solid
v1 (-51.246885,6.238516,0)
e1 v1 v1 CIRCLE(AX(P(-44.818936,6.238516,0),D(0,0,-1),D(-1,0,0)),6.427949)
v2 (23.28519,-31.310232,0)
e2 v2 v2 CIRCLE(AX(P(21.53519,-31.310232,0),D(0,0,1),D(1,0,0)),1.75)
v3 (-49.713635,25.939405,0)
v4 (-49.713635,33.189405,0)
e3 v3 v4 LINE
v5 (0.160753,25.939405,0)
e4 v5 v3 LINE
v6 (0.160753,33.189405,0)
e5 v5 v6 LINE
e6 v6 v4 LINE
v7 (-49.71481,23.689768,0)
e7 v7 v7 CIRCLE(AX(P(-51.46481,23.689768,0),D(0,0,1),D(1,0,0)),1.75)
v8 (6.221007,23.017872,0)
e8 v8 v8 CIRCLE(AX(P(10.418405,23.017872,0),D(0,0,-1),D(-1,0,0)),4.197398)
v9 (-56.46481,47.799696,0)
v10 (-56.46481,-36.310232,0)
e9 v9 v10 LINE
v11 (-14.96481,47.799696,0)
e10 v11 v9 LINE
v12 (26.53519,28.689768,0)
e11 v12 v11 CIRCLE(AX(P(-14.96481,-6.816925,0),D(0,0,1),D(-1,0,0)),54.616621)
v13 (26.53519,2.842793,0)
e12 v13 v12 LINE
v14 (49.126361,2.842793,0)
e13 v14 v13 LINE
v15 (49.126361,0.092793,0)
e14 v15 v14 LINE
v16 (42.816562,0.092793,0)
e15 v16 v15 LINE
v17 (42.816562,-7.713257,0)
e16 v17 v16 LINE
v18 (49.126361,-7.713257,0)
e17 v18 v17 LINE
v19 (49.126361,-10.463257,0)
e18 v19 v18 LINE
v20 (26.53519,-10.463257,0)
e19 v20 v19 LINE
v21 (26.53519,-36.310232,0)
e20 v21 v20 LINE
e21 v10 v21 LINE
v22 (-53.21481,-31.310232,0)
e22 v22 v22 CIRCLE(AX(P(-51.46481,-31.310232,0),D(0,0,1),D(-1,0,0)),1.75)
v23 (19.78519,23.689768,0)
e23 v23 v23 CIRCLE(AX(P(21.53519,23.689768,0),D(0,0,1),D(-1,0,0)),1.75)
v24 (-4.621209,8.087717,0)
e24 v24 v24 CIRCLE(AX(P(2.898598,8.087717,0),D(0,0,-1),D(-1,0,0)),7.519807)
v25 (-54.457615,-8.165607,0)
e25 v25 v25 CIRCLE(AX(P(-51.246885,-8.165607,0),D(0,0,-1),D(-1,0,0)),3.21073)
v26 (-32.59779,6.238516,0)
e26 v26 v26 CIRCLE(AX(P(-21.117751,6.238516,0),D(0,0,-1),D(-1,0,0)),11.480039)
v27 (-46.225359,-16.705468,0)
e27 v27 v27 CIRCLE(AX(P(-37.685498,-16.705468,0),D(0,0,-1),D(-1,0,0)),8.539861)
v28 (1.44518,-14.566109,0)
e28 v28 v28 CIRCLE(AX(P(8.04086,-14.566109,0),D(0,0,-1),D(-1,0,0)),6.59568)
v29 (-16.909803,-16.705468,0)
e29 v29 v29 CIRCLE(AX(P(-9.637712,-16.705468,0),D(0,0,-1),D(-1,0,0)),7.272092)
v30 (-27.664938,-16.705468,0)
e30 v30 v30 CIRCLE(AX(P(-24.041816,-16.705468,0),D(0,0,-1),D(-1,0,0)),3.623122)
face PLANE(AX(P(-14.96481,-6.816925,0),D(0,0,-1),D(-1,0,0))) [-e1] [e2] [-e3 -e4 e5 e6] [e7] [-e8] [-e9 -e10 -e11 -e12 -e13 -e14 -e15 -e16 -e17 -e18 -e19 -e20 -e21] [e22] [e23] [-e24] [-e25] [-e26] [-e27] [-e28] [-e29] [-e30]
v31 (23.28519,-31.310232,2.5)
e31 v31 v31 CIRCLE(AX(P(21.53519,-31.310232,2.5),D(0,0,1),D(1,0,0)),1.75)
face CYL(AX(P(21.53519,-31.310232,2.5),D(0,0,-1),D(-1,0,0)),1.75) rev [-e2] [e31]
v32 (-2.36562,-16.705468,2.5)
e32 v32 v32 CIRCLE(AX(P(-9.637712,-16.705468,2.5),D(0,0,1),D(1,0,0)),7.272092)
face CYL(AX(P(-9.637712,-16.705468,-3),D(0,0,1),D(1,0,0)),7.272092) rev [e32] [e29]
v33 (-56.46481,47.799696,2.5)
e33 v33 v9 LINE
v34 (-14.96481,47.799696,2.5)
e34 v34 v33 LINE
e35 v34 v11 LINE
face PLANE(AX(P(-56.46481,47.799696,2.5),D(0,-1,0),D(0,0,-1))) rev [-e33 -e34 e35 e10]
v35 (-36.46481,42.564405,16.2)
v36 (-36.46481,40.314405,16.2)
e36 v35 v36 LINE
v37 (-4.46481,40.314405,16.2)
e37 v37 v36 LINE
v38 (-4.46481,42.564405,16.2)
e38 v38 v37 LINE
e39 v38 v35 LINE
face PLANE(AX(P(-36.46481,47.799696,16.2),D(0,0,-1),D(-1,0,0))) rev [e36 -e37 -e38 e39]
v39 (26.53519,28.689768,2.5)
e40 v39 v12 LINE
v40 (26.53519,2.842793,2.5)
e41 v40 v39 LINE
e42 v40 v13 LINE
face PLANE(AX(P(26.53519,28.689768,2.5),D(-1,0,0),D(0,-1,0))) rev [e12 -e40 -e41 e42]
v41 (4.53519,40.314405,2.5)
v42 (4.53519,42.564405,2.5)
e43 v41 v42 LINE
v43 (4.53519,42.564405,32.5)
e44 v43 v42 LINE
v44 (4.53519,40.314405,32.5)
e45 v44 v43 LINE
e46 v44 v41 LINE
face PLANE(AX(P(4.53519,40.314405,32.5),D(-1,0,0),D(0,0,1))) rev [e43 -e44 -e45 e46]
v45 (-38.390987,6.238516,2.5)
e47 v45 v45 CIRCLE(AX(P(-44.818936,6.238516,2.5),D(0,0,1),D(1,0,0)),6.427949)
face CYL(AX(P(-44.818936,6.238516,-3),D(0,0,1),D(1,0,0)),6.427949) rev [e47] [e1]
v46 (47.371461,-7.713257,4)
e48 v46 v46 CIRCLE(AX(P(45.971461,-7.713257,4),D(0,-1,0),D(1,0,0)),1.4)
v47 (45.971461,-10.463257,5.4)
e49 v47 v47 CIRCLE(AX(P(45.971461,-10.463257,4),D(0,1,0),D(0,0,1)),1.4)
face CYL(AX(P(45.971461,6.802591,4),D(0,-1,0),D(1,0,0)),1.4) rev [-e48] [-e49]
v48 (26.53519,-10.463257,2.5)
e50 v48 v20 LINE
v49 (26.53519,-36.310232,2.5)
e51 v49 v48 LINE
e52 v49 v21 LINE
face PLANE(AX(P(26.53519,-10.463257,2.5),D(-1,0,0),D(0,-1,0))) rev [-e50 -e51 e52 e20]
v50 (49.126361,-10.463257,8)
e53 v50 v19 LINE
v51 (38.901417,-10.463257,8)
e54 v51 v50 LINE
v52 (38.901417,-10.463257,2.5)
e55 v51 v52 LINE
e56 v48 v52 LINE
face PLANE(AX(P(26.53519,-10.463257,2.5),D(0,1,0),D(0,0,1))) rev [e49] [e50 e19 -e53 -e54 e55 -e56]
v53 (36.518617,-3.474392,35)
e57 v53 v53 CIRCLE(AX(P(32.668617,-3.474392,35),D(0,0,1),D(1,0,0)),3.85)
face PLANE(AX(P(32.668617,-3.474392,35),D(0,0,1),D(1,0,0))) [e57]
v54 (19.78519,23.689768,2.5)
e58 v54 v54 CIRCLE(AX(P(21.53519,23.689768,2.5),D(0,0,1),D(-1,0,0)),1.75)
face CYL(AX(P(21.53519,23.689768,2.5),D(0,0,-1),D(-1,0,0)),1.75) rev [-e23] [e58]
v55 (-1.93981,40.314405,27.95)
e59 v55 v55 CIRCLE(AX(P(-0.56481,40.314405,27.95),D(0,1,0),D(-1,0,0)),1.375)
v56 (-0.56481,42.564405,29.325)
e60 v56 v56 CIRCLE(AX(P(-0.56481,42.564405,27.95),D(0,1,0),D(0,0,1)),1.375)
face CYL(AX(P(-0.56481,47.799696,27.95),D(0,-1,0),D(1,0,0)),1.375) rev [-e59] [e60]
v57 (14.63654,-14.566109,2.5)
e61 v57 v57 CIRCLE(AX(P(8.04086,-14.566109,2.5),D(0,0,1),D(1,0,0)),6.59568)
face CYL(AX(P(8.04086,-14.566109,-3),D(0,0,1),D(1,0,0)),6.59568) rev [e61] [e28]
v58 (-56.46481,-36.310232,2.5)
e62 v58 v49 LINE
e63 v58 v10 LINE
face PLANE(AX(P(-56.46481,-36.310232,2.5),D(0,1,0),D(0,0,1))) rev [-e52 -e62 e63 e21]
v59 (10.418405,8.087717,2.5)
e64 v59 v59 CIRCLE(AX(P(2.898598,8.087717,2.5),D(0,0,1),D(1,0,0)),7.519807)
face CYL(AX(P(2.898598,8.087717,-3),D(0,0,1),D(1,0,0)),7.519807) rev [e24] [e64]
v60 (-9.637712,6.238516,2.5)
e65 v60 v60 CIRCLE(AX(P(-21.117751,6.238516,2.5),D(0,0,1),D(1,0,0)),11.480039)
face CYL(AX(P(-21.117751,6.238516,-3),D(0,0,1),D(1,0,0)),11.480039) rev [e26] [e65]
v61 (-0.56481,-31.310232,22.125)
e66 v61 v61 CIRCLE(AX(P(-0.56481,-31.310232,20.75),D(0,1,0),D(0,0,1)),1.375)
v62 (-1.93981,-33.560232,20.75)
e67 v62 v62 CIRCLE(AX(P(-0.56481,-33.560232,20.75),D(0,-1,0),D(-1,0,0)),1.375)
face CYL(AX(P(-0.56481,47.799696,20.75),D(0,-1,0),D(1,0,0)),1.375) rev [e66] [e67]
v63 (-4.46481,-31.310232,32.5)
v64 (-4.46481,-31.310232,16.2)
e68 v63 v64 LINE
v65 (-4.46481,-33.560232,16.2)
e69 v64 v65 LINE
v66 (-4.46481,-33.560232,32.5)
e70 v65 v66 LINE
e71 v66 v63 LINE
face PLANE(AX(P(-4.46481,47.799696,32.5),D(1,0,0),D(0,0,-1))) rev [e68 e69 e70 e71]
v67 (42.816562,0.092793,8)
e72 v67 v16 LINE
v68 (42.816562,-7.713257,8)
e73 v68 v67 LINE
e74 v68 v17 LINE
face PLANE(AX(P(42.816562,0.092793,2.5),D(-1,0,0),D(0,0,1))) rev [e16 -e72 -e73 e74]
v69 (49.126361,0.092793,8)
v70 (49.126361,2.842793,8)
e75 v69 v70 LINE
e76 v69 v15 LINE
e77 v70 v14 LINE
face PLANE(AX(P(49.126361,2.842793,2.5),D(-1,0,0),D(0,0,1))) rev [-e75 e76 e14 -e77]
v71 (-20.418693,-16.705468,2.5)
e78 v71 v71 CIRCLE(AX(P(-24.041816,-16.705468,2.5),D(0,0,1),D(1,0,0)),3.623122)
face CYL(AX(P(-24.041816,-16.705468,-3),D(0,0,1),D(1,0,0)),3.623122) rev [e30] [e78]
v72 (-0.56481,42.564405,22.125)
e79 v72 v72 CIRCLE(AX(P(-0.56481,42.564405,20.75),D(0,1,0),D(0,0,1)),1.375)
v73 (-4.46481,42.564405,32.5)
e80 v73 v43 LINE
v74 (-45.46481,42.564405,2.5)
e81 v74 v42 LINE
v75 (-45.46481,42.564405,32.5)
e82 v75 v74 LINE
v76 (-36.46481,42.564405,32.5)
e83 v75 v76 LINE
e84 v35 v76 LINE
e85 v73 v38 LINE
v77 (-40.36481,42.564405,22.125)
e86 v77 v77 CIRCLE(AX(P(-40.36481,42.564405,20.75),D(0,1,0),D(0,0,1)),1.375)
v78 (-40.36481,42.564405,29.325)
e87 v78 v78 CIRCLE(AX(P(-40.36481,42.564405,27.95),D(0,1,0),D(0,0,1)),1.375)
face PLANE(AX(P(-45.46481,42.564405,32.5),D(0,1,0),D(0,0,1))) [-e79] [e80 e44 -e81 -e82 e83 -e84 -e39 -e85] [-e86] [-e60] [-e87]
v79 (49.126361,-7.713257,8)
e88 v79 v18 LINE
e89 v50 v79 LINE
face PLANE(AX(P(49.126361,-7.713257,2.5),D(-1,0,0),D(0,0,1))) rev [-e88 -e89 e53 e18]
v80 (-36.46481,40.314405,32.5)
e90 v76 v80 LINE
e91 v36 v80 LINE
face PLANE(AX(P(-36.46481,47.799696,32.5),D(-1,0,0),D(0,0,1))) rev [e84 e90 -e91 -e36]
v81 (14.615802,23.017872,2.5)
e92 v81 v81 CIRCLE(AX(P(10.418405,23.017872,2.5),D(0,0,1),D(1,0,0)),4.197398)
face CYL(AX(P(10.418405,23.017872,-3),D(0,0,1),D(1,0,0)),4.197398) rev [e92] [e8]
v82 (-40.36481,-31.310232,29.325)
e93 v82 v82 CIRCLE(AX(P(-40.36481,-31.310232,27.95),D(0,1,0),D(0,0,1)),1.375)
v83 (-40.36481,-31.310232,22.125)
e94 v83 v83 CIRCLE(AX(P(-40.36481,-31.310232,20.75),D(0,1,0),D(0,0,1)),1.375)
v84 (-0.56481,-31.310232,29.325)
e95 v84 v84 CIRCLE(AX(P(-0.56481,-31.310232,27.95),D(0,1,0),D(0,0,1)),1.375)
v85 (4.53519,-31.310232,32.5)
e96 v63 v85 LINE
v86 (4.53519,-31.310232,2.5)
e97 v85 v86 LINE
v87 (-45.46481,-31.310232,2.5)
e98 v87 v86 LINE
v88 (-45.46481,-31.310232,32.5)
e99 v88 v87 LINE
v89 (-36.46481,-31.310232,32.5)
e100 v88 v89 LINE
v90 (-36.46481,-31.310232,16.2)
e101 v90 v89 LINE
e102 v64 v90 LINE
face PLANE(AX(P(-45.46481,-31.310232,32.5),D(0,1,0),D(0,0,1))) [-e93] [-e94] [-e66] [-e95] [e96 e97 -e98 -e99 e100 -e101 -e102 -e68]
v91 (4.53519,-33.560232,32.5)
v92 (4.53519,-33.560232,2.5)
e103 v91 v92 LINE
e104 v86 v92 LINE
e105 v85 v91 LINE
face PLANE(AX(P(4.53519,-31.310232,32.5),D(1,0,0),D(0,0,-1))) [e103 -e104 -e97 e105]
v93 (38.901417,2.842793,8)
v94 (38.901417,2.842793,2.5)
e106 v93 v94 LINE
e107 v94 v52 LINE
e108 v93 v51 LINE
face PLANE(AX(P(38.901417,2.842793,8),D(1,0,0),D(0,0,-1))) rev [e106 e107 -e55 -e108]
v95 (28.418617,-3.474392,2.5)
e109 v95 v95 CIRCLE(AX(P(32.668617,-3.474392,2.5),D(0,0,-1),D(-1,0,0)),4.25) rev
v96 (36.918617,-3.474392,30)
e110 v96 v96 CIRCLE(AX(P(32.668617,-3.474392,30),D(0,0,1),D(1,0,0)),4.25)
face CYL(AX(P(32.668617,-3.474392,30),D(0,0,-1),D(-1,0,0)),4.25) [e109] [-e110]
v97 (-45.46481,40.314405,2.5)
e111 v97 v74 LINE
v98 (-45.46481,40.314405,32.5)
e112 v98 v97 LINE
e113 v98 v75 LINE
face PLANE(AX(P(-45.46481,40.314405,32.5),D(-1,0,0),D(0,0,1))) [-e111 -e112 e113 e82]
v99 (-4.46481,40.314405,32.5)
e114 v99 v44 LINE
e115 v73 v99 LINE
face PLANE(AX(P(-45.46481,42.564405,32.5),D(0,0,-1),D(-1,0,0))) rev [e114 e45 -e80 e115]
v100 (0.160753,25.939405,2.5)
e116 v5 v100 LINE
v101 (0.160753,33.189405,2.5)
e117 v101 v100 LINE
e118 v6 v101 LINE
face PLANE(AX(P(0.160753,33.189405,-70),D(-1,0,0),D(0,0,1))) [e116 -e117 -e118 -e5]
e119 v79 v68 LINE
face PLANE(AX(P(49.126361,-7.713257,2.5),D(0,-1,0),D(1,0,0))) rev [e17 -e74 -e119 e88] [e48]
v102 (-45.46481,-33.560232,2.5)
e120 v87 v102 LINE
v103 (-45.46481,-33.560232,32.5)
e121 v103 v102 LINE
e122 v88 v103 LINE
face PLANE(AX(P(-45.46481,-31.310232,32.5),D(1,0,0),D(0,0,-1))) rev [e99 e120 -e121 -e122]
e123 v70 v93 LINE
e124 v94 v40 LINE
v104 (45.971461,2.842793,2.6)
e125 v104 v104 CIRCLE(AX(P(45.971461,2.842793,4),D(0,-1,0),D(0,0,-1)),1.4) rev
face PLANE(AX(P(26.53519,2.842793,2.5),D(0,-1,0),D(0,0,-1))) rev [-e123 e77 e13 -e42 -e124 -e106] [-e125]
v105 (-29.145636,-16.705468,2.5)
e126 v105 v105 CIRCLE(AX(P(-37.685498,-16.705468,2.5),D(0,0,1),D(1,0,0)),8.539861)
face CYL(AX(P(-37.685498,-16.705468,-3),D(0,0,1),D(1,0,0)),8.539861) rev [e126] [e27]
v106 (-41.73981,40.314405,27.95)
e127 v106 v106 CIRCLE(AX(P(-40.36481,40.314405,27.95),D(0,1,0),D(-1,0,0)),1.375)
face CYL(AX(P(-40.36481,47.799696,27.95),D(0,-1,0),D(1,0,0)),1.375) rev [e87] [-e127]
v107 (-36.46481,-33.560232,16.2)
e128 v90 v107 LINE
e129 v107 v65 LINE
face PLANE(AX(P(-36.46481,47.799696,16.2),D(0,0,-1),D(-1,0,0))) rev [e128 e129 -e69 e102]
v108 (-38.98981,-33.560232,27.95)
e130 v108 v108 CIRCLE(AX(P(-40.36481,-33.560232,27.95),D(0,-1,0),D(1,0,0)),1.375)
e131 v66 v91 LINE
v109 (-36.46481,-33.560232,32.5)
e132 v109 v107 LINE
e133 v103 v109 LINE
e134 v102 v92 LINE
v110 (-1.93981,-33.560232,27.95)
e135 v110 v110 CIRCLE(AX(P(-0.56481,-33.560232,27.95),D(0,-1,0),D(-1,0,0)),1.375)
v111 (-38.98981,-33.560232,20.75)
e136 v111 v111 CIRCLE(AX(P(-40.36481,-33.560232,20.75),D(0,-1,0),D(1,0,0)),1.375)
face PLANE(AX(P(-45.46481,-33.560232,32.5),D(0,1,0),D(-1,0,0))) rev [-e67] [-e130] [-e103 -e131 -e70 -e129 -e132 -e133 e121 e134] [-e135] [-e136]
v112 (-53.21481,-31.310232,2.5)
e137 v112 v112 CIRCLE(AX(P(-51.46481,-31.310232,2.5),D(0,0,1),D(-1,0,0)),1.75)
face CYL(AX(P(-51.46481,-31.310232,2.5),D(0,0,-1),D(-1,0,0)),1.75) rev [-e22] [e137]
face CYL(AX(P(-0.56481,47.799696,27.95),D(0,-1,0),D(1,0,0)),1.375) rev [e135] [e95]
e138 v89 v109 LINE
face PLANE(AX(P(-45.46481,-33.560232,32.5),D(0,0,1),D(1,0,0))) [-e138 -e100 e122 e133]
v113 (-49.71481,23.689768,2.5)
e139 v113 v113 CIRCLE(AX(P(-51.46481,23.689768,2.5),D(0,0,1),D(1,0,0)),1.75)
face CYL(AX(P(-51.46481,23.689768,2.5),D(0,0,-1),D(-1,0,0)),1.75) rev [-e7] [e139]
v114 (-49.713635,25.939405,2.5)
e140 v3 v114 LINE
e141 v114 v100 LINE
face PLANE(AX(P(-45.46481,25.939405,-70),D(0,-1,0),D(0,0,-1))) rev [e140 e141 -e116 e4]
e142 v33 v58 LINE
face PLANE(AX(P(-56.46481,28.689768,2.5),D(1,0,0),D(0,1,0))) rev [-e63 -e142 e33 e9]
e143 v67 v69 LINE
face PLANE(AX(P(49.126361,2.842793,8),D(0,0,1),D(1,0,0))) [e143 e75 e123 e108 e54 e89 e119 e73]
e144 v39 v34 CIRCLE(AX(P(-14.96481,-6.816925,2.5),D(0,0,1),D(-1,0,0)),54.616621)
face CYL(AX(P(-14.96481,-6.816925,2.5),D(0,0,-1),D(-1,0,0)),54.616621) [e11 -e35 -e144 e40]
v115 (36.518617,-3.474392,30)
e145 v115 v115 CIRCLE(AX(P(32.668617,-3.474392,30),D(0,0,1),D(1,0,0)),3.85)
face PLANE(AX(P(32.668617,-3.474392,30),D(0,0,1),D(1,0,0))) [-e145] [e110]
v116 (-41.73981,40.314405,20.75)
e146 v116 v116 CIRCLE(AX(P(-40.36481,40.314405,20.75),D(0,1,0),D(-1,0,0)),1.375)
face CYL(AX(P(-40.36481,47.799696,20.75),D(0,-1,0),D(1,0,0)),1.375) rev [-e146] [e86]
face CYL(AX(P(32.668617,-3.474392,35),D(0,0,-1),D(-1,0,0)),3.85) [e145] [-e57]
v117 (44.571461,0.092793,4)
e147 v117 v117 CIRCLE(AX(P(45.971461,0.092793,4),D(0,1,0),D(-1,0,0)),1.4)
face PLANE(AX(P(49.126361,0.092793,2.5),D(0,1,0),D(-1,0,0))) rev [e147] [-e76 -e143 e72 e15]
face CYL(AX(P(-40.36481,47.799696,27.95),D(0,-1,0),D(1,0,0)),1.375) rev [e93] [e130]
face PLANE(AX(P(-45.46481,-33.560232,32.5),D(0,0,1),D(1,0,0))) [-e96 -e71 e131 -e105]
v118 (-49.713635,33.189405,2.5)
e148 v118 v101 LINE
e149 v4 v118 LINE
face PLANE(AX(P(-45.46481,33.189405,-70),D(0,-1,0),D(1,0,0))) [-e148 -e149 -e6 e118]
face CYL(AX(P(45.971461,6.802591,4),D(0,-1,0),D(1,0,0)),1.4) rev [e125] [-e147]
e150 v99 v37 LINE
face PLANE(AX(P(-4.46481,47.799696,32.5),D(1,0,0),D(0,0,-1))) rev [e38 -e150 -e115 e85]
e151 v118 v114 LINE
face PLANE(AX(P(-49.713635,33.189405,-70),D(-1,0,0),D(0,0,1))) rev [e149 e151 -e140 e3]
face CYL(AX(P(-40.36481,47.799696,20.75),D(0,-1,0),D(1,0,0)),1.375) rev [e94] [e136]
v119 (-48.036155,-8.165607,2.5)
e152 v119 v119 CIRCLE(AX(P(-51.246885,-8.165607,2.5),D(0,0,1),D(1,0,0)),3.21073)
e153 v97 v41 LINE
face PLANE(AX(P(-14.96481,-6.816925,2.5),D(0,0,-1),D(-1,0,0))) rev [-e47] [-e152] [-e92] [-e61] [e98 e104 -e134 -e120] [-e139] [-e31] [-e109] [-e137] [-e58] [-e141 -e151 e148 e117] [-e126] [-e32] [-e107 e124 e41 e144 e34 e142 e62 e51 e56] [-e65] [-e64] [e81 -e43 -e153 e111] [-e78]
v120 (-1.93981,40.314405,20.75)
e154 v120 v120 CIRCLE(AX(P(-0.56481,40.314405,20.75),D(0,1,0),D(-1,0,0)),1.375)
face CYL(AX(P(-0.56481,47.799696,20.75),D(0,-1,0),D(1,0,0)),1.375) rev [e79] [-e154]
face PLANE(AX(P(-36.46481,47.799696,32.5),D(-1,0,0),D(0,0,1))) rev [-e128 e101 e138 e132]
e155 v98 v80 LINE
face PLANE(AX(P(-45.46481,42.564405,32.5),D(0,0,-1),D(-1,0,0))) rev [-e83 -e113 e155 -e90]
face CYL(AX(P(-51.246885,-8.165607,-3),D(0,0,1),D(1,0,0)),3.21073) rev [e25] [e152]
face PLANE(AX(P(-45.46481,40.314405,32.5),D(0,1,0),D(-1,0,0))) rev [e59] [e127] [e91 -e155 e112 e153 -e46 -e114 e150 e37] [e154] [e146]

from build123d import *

# Parameters (mm, degrees)
SKETCH1_R                      = 1.75
BOSS_EXTRUDE1_DEPTH            = 2.5
CUT_EXTRUDE1_DEPTH             = 72.5
SKETCH3_3_W                    = 50
SKETCH3_3_H                    = 2.25
BOSS_EXTRUDE2_DEPTH            = 30
SKETCH6_R                      = 1.375
SKETCH6_W                      = 32
SKETCH6_H                      = 16.3
CUT_EXTRUDE2_DEPTH             = 105.230334086
SKETCH2_R                      = 4.25
BOSS_EXTRUDE4_DEPTH            = 27.5
SKETCH7_R                      = 3.85
BOSS_EXTRUDE5_DEPTH            = 5
BOSS_EXTRUDE6_DEPTH            = 5.5
CUT_EXTRUDE3_REACH             = 83.788
SKETCH10_R                     = 1.4
CUT_EXTRUDE3_DIRECTION_2_REACH = 83.788
SKETCH11_R                     = 8.539861485
SKETCH11_R_2                   = 11.48003937
SKETCH11_R_3                   = 7.272091534
SKETCH11_R_4                   = 7.519806812
SKETCH11_R_5                   = 6.595679845
SKETCH11_R_6                   = 6.427948737
SKETCH11_R_7                   = 4.197397556
SKETCH11_R_8                   = 3.623122109
SKETCH11_R_9                   = 3.210730166
CUT_EXTRUDE4_DEPTH             = 5.5


with BuildPart() as part:
    # Sketch1 → Boss-Extrude1 (new body)
    with BuildSketch(Plane.XY):
        with BuildLine():
            Line((-56.464809788, 28.68976821), (-56.464809788, -36.31023179))
            Line((-56.464809788, -36.31023179), (26.535190212, -36.31023179))
            Line((26.535190212, -36.31023179), (26.535190212, -10.463256981))
            Line((26.535190212, -10.463256981), (49.126360761, -10.463256981))
            Line((49.126360761, -10.463256981), (49.126360761, -7.713256981))
            Line((49.126360761, -7.713256981), (42.816561641, -7.713256981))
            Line((42.816561641, -7.713256981), (42.816561641, 0.0927934))
            Line((42.816561641, 0.0927934), (49.126360761, 0.0927934))
            Line((49.126360761, 0.0927934), (49.126360761, 2.8427934))
            Line((49.126360761, 2.8427934), (26.535190212, 2.8427934))
            Line((26.535190212, 2.8427934), (26.535190212, 28.68976821))
            ThreePointArc((26.535190212, 28.68976821), (7.879441831, 42.792705368), (-14.964809788, 47.799695688))
            Line((-14.964809788, 47.799695688), (-56.464809788, 47.799695688))
            Line((-56.464809788, 47.799695688), (-56.464809788, 28.68976821))
        make_face()
        with Locations((-51.464809788, 23.68976821)):
            Circle(SKETCH1_R, mode=Mode.SUBTRACT)
        with Locations((21.535190212, 23.68976821)):
            Circle(SKETCH1_R, mode=Mode.SUBTRACT)
        with Locations((21.535190212, -31.31023179)):
            Circle(SKETCH1_R, mode=Mode.SUBTRACT)
        with Locations((-51.464809788, -31.31023179)):
            Circle(SKETCH1_R, mode=Mode.SUBTRACT)
    extrude(amount=BOSS_EXTRUDE1_DEPTH)

    # Sketch3 → Cut-Extrude1 (cut)
    with BuildSketch(Plane.XY.offset(2.5)):
        Polygon((-45.464809788, 33.189405095), (0.160752733, 33.189405095), (0.160752733, 25.939405095), (-45.464809788, 25.939405095), (-49.713634909, 25.939405095), (-49.713634909, 33.189405095), align=None)
    extrude(amount=-CUT_EXTRUDE1_DEPTH, mode=Mode.SUBTRACT)

    # Sketch3<3> → Boss-Extrude2 (add)
    with BuildSketch(Plane.XY.offset(2.5)):
        with Locations((-20.464809788, -32.43523179)):
            Rectangle(SKETCH3_3_W, SKETCH3_3_H)
        with Locations((-20.464809788, 41.439405095)):
            Rectangle(SKETCH3_3_W, SKETCH3_3_H)
    extrude(amount=BOSS_EXTRUDE2_DEPTH)

    # Sketch6 → Cut-Extrude2 (cut, through all)
    with BuildSketch(Plane.XZ.offset(33.56023179)):
        with Locations((-40.364809788, 27.95)):
            Circle(SKETCH6_R)
        with Locations((-40.364809788, 20.75)):
            Circle(SKETCH6_R)
        with Locations((-0.564809788, 20.75)):
            Circle(SKETCH6_R)
        with Locations((-0.564809788, 27.95)):
            Circle(SKETCH6_R)
        with Locations((-20.464809788, 24.35)):
            Rectangle(SKETCH6_W, SKETCH6_H)
    extrude(amount=-CUT_EXTRUDE2_DEPTH, mode=Mode.SUBTRACT)

    # Sketch2 → Boss-Extrude4 (add)
    with BuildSketch(Plane.XY.offset(2.5)):
        with Locations((32.668616658, -3.474392223)):
            Circle(SKETCH2_R)
    extrude(amount=BOSS_EXTRUDE4_DEPTH)

    # Sketch7 → Boss-Extrude5 (add)
    with BuildSketch(Plane.XY.offset(30)):
        with Locations((32.668616658, -3.474392223)):
            Circle(SKETCH7_R)
    extrude(amount=BOSS_EXTRUDE5_DEPTH)

    # Sketch8 → Boss-Extrude6 (add)
    with BuildSketch(Plane.XY.offset(2.5)):
        Polygon((49.126360761, 2.8427934), (38.901417253, 2.8427934), (38.901417253, -10.463256981), (49.126360761, -10.463256981), (49.126360761, -7.713256981), (42.816561641, -7.713256981), (42.816561641, 0.0927934), (49.126360761, 0.0927934), align=None)
    extrude(amount=BOSS_EXTRUDE6_DEPTH)

    # Sketch10 → Cut-Extrude3 (cut, up to next)
    with BuildSketch(Plane.XZ.offset(-0.0927934), mode=Mode.PRIVATE) as cut_extrude3_sk1:
        with Locations((45.971461201, 4)):
            Circle(SKETCH10_R)
    cut_extrude3_tool1 = extrude(cut_extrude3_sk1.sketch, amount=-CUT_EXTRUDE3_REACH, mode=Mode.PRIVATE) & part.part
    add(cut_extrude3_tool1.solids().sort_by_distance((45.971461, 0.092793, 4))[0], mode=Mode.SUBTRACT)

    # Sketch10 → Cut-Extrude3 direction 2 (cut, up to next)
    with BuildSketch(Plane.XZ.offset(-0.0927934), mode=Mode.PRIVATE) as cut_extrude3_direction_2_sk1:
        with Locations((45.971461201, 4)):
            Circle(SKETCH10_R)
    cut_extrude3_direction_2_tool1 = extrude(cut_extrude3_direction_2_sk1.sketch, amount=CUT_EXTRUDE3_DIRECTION_2_REACH, mode=Mode.PRIVATE) & part.part
    add(cut_extrude3_direction_2_tool1.solids().sort_by_distance((45.971461, 0.092793, 4))[0], mode=Mode.SUBTRACT)

    # Sketch11 → Cut-Extrude4 (cut)
    with BuildSketch(Plane.XY.offset(2.5)):
        with Locations((-37.685497527, -16.705468454)):
            Circle(SKETCH11_R)
        with Locations((-21.117750948, 6.238516068)):
            Circle(SKETCH11_R_2)
        with Locations((-9.637711577, -16.705468454)):
            Circle(SKETCH11_R_3)
        with Locations((2.898597996, 8.08771742)):
            Circle(SKETCH11_R_4)
        with Locations((8.040859787, -14.56610874)):
            Circle(SKETCH11_R_5)
        with Locations((-44.818935978, 6.238516068)):
            Circle(SKETCH11_R_6)
        with Locations((10.418404807, 23.017872193)):
            Circle(SKETCH11_R_7)
        with Locations((-24.041815555, -16.705468454)):
            Circle(SKETCH11_R_8)
        with Locations((-51.246884715, -8.165606969)):
            Circle(SKETCH11_R_9)
    extrude(amount=-CUT_EXTRUDE4_DEPTH, mode=Mode.SUBTRACT)


solid = part.part
